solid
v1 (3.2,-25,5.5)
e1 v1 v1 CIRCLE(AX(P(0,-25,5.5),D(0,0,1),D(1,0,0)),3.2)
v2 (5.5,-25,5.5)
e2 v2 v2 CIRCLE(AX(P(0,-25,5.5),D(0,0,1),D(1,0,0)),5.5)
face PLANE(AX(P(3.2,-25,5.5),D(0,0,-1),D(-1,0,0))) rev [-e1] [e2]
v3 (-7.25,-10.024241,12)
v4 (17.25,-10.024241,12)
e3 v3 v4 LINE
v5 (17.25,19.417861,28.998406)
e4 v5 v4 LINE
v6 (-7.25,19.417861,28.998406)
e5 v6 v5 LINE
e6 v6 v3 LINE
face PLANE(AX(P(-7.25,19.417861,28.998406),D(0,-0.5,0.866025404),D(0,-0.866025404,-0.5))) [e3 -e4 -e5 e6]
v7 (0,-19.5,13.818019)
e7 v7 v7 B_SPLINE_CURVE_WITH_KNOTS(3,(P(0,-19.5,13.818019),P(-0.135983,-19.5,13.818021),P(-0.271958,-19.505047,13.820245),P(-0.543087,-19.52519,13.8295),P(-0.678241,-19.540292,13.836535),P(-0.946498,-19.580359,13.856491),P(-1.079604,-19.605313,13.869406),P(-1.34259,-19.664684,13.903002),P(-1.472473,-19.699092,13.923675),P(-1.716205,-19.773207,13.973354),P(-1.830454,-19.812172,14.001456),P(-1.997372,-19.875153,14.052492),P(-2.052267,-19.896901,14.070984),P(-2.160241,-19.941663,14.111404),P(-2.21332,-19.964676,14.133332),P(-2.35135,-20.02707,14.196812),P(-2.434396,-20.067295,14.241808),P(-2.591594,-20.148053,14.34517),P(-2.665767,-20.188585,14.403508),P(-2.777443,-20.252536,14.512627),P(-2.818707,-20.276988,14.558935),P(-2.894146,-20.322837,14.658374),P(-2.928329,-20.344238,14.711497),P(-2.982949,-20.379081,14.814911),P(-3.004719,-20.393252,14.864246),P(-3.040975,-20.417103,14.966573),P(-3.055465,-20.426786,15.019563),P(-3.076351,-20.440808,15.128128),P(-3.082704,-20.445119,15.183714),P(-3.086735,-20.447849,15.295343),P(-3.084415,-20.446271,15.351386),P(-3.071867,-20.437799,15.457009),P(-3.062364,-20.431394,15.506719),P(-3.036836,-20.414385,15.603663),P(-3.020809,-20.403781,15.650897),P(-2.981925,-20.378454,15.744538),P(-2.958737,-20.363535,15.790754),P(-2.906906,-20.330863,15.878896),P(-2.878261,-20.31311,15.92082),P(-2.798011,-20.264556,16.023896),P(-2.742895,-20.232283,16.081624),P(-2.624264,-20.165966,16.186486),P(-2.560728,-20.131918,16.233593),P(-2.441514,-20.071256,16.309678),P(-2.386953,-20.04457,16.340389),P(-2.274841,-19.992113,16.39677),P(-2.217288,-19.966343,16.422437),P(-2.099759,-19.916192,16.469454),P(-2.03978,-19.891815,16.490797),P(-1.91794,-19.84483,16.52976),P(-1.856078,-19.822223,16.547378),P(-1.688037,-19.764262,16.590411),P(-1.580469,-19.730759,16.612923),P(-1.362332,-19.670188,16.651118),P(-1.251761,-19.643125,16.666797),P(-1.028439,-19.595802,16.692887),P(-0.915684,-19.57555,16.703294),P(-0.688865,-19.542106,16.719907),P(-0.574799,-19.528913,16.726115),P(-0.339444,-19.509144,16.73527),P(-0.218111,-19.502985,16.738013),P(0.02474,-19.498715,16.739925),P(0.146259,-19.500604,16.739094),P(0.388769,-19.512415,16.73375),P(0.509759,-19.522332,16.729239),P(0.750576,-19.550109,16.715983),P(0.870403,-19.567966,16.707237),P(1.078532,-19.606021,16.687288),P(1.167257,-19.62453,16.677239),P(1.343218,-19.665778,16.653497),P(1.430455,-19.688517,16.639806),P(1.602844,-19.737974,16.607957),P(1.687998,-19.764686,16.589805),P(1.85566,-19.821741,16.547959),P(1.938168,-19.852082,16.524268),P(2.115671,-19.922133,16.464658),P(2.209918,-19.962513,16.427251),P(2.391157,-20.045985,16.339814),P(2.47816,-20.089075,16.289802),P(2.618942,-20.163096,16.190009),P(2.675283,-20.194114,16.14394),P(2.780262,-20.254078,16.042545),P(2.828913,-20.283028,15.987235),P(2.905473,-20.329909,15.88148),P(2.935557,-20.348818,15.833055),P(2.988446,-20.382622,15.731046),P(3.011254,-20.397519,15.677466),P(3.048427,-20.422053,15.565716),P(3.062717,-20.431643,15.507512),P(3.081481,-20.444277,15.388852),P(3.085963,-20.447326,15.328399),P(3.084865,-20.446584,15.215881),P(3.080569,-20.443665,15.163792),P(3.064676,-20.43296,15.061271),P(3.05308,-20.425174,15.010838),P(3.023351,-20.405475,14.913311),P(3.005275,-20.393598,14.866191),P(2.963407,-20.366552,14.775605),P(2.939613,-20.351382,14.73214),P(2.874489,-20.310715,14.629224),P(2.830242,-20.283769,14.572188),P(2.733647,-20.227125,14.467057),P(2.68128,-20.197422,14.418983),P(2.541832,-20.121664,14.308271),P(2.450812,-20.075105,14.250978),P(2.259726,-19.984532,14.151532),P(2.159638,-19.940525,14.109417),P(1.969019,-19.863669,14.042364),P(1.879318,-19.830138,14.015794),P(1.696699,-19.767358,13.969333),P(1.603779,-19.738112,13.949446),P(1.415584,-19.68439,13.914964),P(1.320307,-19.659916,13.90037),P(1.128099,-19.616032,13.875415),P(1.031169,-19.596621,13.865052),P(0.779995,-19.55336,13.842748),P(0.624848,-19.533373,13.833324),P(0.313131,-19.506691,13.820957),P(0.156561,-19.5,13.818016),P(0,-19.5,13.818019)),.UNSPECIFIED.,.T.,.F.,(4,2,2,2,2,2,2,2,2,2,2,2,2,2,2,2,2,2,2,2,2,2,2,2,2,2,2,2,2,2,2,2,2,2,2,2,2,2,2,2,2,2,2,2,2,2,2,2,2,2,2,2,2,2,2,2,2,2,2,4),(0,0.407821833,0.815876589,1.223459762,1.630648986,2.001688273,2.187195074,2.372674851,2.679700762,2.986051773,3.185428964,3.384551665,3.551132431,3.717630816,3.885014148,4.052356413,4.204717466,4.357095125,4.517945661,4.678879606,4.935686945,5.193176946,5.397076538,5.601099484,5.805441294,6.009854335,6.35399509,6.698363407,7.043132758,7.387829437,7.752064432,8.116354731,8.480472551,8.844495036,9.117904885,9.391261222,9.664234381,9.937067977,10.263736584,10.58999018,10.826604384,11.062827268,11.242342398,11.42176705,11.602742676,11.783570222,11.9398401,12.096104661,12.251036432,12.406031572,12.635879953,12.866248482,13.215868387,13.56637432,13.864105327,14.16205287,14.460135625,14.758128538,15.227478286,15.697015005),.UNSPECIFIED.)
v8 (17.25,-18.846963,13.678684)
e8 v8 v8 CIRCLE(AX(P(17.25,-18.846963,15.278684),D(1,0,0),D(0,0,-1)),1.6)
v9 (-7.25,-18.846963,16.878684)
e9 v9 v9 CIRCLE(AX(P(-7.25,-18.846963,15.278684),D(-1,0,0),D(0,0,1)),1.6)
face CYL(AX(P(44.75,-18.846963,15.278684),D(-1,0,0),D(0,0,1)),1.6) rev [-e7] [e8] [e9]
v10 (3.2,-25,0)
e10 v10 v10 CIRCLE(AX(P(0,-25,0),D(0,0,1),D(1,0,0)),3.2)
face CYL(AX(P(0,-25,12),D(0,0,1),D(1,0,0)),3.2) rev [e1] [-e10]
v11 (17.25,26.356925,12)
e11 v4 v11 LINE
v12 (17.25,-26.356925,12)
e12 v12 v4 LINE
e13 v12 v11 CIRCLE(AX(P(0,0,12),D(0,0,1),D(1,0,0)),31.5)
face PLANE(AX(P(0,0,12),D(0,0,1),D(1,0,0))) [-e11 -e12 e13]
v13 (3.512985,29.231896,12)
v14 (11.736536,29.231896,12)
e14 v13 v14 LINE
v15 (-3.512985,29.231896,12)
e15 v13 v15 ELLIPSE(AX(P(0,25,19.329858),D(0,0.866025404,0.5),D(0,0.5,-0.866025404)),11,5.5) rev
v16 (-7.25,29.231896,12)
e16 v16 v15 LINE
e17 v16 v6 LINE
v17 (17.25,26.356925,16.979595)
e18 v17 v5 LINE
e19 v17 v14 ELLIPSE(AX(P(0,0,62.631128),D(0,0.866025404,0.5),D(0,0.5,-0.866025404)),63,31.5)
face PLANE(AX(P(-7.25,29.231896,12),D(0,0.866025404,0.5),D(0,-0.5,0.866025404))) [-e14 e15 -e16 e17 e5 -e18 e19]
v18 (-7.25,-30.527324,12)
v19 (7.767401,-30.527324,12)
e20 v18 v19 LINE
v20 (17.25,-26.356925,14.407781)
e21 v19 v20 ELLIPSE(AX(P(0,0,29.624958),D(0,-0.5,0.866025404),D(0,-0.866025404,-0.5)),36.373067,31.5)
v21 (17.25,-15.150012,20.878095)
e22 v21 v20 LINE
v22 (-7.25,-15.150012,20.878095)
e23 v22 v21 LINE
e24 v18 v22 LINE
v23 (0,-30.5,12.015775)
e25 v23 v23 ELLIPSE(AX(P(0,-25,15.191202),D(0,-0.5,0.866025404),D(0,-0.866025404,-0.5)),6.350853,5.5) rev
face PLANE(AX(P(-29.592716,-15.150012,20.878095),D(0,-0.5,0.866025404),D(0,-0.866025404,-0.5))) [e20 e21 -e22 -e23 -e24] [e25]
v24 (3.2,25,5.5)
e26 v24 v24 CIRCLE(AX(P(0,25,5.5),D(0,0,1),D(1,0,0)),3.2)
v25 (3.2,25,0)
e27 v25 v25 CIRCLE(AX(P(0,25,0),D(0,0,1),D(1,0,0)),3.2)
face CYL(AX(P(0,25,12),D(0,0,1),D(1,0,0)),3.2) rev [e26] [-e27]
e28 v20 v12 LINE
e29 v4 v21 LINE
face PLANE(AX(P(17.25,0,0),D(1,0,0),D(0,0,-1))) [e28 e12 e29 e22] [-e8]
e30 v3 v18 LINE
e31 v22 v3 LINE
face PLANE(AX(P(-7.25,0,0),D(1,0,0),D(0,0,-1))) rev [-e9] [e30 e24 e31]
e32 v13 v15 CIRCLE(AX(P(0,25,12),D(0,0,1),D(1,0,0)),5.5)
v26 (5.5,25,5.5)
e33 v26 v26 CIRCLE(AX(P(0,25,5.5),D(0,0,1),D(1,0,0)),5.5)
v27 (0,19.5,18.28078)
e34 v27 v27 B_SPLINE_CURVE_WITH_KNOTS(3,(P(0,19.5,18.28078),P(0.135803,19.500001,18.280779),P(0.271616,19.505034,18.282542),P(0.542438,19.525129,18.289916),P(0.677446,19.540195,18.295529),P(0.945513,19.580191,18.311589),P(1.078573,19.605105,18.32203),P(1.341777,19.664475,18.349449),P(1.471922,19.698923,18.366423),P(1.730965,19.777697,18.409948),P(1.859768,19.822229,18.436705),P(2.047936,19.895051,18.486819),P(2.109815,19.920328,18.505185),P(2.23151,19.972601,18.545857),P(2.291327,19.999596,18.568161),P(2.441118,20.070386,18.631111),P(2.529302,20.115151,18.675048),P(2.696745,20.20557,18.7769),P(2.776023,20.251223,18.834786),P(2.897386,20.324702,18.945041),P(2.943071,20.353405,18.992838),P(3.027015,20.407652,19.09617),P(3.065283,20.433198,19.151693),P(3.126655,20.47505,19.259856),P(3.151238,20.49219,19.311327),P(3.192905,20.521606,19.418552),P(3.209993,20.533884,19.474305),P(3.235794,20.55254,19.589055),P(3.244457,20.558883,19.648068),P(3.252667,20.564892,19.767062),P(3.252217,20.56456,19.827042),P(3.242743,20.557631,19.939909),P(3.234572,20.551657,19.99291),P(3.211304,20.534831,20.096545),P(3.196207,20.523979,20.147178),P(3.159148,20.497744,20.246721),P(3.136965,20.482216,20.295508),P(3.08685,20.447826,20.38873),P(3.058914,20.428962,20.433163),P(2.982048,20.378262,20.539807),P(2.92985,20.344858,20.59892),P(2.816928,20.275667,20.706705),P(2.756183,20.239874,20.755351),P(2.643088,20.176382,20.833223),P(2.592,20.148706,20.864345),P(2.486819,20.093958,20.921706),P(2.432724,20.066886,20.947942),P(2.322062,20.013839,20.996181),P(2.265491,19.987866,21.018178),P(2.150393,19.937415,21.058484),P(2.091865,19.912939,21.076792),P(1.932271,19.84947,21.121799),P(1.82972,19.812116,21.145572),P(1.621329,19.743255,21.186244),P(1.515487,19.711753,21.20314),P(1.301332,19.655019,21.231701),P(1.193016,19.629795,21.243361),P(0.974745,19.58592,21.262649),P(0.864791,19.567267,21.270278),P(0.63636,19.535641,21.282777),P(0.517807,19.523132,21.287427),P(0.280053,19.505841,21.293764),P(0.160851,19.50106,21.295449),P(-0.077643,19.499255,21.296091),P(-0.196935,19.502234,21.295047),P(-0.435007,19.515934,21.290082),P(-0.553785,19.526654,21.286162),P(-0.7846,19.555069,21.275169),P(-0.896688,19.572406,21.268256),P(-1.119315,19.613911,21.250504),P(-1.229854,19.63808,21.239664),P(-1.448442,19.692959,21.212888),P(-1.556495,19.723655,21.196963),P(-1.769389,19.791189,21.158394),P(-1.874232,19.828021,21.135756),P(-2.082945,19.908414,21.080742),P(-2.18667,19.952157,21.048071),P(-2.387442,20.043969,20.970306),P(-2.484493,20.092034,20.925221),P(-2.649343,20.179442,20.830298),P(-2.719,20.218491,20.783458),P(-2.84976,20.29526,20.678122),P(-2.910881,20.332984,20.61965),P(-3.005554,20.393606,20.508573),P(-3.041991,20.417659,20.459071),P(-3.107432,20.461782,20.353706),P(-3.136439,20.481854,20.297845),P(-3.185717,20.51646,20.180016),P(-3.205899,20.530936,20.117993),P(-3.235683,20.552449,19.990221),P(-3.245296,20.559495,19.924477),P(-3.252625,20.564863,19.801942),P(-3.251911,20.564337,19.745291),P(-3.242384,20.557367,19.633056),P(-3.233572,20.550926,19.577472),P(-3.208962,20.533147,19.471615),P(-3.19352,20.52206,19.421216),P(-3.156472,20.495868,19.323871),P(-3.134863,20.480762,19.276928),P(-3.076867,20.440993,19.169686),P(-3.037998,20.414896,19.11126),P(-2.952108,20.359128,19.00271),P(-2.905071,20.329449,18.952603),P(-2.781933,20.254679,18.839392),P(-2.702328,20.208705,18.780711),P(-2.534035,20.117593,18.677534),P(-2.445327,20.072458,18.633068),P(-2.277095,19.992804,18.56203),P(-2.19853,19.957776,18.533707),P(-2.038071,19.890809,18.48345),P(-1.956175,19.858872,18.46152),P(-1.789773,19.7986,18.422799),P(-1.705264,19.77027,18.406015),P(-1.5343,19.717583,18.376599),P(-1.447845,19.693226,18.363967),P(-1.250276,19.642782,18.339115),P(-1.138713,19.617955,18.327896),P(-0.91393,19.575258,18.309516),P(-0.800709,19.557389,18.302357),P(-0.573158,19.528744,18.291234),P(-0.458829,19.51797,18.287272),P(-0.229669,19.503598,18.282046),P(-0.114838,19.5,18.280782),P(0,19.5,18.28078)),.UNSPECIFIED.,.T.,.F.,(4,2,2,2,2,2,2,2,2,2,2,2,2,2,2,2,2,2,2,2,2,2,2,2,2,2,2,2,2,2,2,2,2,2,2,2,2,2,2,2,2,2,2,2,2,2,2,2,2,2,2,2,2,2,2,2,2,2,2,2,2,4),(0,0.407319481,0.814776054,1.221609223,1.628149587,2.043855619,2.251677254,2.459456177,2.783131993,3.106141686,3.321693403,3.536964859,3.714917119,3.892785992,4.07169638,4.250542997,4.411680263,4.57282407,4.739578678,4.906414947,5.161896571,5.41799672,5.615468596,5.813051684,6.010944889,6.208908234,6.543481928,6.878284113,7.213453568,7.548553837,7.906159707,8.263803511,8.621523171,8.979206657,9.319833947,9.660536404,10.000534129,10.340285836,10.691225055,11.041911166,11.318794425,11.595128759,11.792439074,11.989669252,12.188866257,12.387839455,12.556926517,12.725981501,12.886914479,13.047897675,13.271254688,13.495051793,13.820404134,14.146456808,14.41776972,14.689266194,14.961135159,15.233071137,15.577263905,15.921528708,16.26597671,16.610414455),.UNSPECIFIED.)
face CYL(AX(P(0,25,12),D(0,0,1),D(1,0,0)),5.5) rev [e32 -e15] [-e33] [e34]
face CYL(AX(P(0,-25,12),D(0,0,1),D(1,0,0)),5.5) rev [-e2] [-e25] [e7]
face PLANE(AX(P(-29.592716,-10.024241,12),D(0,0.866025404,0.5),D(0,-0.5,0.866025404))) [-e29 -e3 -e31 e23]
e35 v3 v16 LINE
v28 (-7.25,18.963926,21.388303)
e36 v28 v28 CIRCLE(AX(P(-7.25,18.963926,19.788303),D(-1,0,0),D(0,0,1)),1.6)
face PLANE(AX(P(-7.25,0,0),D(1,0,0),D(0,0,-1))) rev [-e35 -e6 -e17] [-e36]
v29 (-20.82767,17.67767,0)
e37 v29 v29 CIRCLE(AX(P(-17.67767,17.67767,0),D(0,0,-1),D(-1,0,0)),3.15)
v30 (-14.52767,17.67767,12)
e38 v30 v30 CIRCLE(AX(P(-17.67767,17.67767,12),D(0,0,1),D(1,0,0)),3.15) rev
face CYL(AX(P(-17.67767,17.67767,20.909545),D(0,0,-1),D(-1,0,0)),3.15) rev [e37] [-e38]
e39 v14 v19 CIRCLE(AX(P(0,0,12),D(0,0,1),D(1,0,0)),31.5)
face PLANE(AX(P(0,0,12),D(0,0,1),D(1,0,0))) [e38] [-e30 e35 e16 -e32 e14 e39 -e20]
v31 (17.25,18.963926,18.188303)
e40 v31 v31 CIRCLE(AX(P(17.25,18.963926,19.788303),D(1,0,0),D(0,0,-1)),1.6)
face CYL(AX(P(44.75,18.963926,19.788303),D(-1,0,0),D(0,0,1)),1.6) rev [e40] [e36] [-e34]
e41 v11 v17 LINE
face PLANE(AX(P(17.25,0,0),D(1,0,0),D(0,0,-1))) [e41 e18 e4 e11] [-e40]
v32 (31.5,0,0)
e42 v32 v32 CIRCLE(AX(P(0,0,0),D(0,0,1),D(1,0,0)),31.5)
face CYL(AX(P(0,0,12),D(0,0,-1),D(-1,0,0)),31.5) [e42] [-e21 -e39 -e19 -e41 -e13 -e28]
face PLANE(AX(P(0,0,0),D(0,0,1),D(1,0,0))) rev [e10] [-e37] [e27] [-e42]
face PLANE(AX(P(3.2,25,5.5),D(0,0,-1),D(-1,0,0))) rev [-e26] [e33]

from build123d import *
from build123d.topology import SkipClean

# Parameters (mm, degrees)
SKETCH2_R                      = 31.5
BOSS_EXTRUDE1_DEPTH            = 12
CBORE_FOR_M6_SHCS1_D           = 6.4
CBORE_FOR_M6_SHCS1_CBORE_D     = 11
CBORE_FOR_M6_SHCS1_CBORE_DEPTH = 6.5
SKETCH5_R                      = 3.15
CUT_EXTRUDE1_DEPTH             = 12
BOSS_EXTRUDE2_DEPTH            = 24.5
CUT_EXTRUDE2_START             = 65
SKETCH7_R                      = 5.5
CUT_EXTRUDE2_DEPTH             = 65
BOSS_EXTRUDE3_REACH            = 66.882
CUT_EXTRUDE3_START             = 82
SKETCH9_R                      = 5.5
CUT_EXTRUDE3_DEPTH             = 82
SKETCH11_R                     = 51.4472096
SKETCH11_R_2                   = 31.5
CUT_EXTRUDE4_DEPTH             = 82
SKETCH12_R                     = 1.6
CUT_EXTRUDE5_DEPTH             = 52


with BuildPart() as part:
    # Sketch2 → Boss-Extrude1 (new body)
    with BuildSketch(Plane.XY):
        Circle(SKETCH2_R)
    extrude(amount=BOSS_EXTRUDE1_DEPTH)

    # CBORE for M6 SHCS1 (through all)
    with Locations(Plane.XY.offset(12)):
        with Locations((0, 25), (0, -25)):
            CounterBoreHole(CBORE_FOR_M6_SHCS1_D / 2, CBORE_FOR_M6_SHCS1_CBORE_D / 2, CBORE_FOR_M6_SHCS1_CBORE_DEPTH)

    # Sketch5 → Cut-Extrude1 (cut)
    with BuildSketch(Plane(origin=(0, 0, 0), x_dir=(-1, 0, 0), z_dir=(0, 0, -1))):
        with Locations((17.67766953, 17.67766953)):
            Circle(SKETCH5_R)
    extrude(amount=-CUT_EXTRUDE1_DEPTH, mode=Mode.SUBTRACT)

    # Sketch6 → Boss-Extrude2 (add)
    with BuildSketch(Plane(origin=(17.25, 0, 0), x_dir=(0, 0, -1), z_dir=(1, 0, 0))):
        Polygon((-12, 29.231895539), (-28.9984059, 19.417861316), (-12, -10.02424135), align=None)
    extrude(amount=-BOSS_EXTRUDE2_DEPTH)

    # Sketch7 → Cut-Extrude2 (cut)
    with BuildSketch(Plane.XY.offset(12).offset(CUT_EXTRUDE2_START)):
        with Locations((0, 25)):
            Circle(SKETCH7_R)
    extrude(amount=-CUT_EXTRUDE2_DEPTH, mode=Mode.SUBTRACT)

    # Boss-Extrude3: up to this face of the body (flat: up to its plane)
    boss_extrude3_end = Plane(part.part.faces().sort_by_distance((-7.25, 12.875171835, 17.6661353))[0])
    # Sketch8 → Boss-Extrude3 (add, up to the picked face)
    with BuildSketch(Plane(origin=(17.25, 0, 0), x_dir=(0, 0, -1), z_dir=(1, 0, 0)), mode=Mode.PRIVATE) as boss_extrude3_sk1:
        Polygon((-12, -10.02424135), (-20.878095029, -15.150011905), (-12, -30.52732357), align=None)
    boss_extrude3_tool1 = split(extrude(boss_extrude3_sk1.sketch, amount=-BOSS_EXTRUDE3_REACH, mode=Mode.PRIVATE), bisect_by=boss_extrude3_end, keep=Keep.BOTH, mode=Mode.PRIVATE)
    add(boss_extrude3_tool1.solids().sort_by(Axis((17.25, -18.567192, 14.959365), (-1, 0, 0)))[0])

    # Sketch9 → Cut-Extrude3 (cut)
    with BuildSketch(Plane.XY.offset(12).offset(CUT_EXTRUDE3_START)):
        with Locations((0, -25)):
            Circle(SKETCH9_R)
    extrude(amount=-CUT_EXTRUDE3_DEPTH, mode=Mode.SUBTRACT)

    # Sketch11 → Cut-Extrude4 (cut)
    with SkipClean():  # the faces are left unmerged after this step: merging them gives an invalid solid
        with BuildSketch(Plane(origin=(0, 0, 0), x_dir=(-1, 0, 0), z_dir=(0, 0, -1))):
            Circle(SKETCH11_R)
            with Locations(Location((0, 0, 0), (0, 0, 255.72452839))):
                Circle(SKETCH11_R_2, mode=Mode.SUBTRACT)
        extrude(amount=-CUT_EXTRUDE4_DEPTH, mode=Mode.SUBTRACT)
    add(part.part.scale(1), mode=Mode.REPLACE)  # the faces are merged on a copy

    # Sketch12 → Cut-Extrude5 (cut)
    with BuildSketch(Plane.ZY.offset(7.25)):
        with Locations((19.788303121, 18.963925862)):
            Circle(SKETCH12_R)
        with Locations((15.278684177, -18.84696327)):
            Circle(SKETCH12_R)
    extrude(amount=-CUT_EXTRUDE5_DEPTH, mode=Mode.SUBTRACT)


solid = part.part
